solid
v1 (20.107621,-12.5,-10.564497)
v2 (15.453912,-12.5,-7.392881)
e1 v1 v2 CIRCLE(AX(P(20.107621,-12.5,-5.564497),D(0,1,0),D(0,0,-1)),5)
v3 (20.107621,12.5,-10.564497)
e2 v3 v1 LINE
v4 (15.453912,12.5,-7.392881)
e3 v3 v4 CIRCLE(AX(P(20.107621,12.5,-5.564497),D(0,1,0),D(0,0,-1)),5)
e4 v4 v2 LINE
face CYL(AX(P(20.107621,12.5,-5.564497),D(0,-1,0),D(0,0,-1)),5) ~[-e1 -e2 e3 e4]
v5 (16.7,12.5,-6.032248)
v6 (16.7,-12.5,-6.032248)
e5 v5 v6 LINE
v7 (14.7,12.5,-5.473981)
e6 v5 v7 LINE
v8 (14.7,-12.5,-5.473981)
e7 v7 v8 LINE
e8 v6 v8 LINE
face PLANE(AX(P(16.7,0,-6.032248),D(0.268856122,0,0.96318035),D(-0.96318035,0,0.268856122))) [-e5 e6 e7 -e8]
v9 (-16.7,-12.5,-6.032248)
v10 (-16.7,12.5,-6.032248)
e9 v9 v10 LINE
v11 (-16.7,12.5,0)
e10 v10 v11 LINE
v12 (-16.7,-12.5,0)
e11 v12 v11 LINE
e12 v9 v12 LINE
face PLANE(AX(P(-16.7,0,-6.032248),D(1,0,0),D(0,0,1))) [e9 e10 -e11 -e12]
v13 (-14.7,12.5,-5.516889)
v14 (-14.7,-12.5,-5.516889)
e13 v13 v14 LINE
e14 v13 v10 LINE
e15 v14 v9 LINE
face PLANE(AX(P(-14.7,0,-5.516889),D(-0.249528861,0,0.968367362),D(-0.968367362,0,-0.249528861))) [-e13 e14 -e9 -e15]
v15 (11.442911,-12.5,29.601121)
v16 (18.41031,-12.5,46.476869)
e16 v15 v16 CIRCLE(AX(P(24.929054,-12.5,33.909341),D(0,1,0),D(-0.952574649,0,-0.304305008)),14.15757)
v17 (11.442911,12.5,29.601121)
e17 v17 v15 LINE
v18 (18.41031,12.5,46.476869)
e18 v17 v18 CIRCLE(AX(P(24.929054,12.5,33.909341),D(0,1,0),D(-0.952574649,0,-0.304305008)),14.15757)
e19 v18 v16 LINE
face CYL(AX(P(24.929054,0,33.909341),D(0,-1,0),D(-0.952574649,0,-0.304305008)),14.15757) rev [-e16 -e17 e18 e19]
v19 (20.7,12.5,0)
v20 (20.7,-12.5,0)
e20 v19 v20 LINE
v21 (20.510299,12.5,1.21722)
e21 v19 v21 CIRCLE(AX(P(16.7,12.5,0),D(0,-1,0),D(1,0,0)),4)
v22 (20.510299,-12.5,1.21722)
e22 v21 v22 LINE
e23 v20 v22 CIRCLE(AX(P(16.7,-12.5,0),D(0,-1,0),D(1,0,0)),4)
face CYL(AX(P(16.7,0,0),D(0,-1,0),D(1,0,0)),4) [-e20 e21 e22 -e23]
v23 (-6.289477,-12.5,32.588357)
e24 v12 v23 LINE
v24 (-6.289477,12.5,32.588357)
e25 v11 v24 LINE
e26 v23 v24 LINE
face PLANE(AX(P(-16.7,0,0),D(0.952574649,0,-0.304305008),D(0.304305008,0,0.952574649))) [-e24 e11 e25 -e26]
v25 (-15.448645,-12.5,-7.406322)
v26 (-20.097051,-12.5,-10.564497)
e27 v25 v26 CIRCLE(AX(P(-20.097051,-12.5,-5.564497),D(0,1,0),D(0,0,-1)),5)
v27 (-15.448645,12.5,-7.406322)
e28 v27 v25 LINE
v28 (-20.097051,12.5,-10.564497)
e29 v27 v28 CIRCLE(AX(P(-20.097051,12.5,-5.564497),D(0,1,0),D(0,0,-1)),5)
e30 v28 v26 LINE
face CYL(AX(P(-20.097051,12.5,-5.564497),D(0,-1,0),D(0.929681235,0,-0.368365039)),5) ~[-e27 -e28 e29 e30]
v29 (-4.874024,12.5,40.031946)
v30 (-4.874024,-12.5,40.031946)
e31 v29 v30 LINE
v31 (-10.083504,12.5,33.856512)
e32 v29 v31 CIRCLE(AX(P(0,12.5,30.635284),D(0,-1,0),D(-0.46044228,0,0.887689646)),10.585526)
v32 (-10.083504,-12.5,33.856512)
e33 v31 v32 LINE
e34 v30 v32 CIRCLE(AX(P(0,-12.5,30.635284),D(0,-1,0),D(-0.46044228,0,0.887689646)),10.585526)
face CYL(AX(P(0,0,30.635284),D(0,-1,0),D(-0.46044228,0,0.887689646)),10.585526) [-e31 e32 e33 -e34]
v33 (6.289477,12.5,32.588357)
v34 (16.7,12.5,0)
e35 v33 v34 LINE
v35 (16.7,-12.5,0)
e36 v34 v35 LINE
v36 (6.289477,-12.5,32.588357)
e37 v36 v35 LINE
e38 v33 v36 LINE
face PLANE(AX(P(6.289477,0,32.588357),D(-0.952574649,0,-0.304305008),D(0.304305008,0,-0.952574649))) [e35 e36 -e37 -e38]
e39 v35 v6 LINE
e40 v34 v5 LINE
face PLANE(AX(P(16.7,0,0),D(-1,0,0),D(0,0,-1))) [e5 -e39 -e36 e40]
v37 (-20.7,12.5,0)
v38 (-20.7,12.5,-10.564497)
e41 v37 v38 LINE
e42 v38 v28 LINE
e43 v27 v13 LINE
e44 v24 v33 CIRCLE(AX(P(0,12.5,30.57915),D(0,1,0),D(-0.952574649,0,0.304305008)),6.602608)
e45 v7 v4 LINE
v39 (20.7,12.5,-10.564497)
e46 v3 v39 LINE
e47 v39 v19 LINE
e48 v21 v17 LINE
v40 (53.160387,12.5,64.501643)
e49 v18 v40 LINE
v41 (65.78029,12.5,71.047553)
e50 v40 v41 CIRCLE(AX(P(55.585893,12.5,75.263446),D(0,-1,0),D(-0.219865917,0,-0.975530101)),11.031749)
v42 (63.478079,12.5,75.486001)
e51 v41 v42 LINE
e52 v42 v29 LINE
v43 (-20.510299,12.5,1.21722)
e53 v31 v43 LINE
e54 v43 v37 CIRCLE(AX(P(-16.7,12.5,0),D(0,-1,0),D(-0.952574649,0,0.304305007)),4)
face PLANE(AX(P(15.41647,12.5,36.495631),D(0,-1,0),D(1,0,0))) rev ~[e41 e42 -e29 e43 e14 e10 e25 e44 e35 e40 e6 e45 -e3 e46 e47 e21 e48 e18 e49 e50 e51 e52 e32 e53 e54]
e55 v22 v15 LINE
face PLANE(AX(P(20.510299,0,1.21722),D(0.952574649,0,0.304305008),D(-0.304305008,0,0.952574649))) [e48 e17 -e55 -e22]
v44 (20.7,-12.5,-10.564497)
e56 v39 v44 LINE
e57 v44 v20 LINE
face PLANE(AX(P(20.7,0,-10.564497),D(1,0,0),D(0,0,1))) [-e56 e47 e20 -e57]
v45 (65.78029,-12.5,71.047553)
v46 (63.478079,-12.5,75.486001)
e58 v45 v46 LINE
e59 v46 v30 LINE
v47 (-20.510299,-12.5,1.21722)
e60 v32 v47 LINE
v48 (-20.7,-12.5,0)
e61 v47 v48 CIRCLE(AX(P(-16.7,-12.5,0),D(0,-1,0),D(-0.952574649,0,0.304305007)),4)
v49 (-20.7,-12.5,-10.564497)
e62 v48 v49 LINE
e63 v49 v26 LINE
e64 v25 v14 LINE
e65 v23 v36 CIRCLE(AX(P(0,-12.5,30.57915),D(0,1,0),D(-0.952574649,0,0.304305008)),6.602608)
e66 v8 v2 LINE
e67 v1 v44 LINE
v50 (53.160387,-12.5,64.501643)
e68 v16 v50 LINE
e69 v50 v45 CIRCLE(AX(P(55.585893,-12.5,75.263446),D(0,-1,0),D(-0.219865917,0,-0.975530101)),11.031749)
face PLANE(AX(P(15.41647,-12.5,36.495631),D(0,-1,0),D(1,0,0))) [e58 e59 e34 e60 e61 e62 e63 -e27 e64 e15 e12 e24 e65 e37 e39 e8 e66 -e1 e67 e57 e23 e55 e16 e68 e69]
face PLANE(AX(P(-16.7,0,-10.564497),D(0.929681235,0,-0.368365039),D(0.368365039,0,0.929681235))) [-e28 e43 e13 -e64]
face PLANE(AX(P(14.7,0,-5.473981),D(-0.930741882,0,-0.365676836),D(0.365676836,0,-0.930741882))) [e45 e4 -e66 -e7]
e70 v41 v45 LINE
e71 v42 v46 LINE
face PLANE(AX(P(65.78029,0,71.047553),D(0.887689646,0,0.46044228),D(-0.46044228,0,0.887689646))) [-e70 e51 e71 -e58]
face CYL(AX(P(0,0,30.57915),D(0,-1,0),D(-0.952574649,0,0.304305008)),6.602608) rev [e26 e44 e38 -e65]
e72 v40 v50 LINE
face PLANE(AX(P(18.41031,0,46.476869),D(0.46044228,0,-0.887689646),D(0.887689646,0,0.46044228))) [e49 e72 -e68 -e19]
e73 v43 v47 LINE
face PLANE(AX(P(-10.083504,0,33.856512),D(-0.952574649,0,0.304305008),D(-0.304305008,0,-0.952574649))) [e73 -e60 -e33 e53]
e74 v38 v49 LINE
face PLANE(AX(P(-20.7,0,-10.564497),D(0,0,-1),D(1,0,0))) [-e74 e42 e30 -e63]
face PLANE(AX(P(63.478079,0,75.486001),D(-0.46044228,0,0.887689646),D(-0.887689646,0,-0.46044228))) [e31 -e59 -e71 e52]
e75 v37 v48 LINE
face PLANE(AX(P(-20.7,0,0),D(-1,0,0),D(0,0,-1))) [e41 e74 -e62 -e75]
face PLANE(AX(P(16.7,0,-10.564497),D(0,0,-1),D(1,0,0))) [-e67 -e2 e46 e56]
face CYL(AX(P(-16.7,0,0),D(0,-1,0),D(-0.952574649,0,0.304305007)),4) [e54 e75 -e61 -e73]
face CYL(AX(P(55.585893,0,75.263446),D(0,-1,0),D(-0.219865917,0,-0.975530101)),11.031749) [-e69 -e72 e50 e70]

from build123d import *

# Parameters (mm, degrees)
F1_DEPTH = 12.5
F2_R     = 5


# Not quite as in the source:
# - a feature names something its author has since deleted; it is built from what else it names


with BuildPart() as f1:
    # F0 (on Front) → F1 (new body, symmetric)
    with BuildSketch(Plane.XZ):
        with BuildLine():
            ThreePointArc((-6.2894771713, 32.5883566917), (0, 37.1817581393), (6.2894771713, 32.5883566917))
            Line((6.2894771713, 32.5883566917), (16.7, 0))
            Line((16.7, 0), (20.7, 0))
            ThreePointArc((20.7, 0), (20.6522901201, 0.6159568218), (20.5102985969, 1.2172200305))
            Line((20.5102985969, 1.2172200305), (11.4429113124, 29.6011211997))
            ThreePointArc((11.4429113124, 29.6011211997), (11.8429318518, 39.3121369153), (18.4103098825, 46.4768691826))
            Line((18.4103098825, 46.4768691826), (53.1603869456, 64.5016425675))
            Line((53.1603869456, 64.5016425675), (65.7802901999, 71.0475531243))
            Line((65.7802901999, 71.0475531243), (63.4780788017, 75.4860013529))
            Line((63.4780788017, 75.4860013529), (-4.8740239191, 40.0319458213))
            ThreePointArc((-4.8740239191, 40.0319458213), (-8.0911004209, 37.4607846039), (-10.0835041229, 33.8565123177))
            Line((-10.0835041229, 33.8565123177), (-20.5102985969, 1.2172200305))
            ThreePointArc((-20.5102985969, 1.2172200305), (-20.6522901201, 0.6159568218), (-20.7, 0))
            Line((-20.7, 0), (-16.7, 0))
            Line((-16.7, 0), (-6.2894771713, 32.5883566917))
        make_face()
        Polygon((-16.7, -5.2822484933), (-16.7, 0), (-20.7, 0), (-20.7, -10.5644969866), (-16.7, -10.5644969866), (-16.7, -6.0322484933), align=None)
        Polygon((20.7, 0), (16.7, 0), (16.7, -5.2822484933), (16.7, -6.0322484933), (16.7, -10.5644969866), (20.7, -10.5644969866), align=None)
        with BuildLine():
            Line((65.7802901999, 71.0475531243), (53.1603869456, 64.5016425675))
            ThreePointArc((53.1603869456, 64.5016425675), (60.6653765198, 65.4706764668), (65.7802901999, 71.0475531243))
        make_face()
        Polygon((-14.7, -5.5168885775), (-16.7, -6.0322484933), (-16.7, -10.5644969866), align=None)
        Polygon((16.7, -10.5644969866), (16.7, -6.0322484933), (14.7, -5.4739810377), align=None)
    extrude(amount=F1_DEPTH, both=True)

    # F2
    f2_edges = [f1.edges().sort_by_distance(p)[0] for p in [
        (16.7, 0, -10.564497),
        (-16.7, 0, -10.564497),
    ]]
    fillet(f2_edges, radius=F2_R)


solid = f1.part
